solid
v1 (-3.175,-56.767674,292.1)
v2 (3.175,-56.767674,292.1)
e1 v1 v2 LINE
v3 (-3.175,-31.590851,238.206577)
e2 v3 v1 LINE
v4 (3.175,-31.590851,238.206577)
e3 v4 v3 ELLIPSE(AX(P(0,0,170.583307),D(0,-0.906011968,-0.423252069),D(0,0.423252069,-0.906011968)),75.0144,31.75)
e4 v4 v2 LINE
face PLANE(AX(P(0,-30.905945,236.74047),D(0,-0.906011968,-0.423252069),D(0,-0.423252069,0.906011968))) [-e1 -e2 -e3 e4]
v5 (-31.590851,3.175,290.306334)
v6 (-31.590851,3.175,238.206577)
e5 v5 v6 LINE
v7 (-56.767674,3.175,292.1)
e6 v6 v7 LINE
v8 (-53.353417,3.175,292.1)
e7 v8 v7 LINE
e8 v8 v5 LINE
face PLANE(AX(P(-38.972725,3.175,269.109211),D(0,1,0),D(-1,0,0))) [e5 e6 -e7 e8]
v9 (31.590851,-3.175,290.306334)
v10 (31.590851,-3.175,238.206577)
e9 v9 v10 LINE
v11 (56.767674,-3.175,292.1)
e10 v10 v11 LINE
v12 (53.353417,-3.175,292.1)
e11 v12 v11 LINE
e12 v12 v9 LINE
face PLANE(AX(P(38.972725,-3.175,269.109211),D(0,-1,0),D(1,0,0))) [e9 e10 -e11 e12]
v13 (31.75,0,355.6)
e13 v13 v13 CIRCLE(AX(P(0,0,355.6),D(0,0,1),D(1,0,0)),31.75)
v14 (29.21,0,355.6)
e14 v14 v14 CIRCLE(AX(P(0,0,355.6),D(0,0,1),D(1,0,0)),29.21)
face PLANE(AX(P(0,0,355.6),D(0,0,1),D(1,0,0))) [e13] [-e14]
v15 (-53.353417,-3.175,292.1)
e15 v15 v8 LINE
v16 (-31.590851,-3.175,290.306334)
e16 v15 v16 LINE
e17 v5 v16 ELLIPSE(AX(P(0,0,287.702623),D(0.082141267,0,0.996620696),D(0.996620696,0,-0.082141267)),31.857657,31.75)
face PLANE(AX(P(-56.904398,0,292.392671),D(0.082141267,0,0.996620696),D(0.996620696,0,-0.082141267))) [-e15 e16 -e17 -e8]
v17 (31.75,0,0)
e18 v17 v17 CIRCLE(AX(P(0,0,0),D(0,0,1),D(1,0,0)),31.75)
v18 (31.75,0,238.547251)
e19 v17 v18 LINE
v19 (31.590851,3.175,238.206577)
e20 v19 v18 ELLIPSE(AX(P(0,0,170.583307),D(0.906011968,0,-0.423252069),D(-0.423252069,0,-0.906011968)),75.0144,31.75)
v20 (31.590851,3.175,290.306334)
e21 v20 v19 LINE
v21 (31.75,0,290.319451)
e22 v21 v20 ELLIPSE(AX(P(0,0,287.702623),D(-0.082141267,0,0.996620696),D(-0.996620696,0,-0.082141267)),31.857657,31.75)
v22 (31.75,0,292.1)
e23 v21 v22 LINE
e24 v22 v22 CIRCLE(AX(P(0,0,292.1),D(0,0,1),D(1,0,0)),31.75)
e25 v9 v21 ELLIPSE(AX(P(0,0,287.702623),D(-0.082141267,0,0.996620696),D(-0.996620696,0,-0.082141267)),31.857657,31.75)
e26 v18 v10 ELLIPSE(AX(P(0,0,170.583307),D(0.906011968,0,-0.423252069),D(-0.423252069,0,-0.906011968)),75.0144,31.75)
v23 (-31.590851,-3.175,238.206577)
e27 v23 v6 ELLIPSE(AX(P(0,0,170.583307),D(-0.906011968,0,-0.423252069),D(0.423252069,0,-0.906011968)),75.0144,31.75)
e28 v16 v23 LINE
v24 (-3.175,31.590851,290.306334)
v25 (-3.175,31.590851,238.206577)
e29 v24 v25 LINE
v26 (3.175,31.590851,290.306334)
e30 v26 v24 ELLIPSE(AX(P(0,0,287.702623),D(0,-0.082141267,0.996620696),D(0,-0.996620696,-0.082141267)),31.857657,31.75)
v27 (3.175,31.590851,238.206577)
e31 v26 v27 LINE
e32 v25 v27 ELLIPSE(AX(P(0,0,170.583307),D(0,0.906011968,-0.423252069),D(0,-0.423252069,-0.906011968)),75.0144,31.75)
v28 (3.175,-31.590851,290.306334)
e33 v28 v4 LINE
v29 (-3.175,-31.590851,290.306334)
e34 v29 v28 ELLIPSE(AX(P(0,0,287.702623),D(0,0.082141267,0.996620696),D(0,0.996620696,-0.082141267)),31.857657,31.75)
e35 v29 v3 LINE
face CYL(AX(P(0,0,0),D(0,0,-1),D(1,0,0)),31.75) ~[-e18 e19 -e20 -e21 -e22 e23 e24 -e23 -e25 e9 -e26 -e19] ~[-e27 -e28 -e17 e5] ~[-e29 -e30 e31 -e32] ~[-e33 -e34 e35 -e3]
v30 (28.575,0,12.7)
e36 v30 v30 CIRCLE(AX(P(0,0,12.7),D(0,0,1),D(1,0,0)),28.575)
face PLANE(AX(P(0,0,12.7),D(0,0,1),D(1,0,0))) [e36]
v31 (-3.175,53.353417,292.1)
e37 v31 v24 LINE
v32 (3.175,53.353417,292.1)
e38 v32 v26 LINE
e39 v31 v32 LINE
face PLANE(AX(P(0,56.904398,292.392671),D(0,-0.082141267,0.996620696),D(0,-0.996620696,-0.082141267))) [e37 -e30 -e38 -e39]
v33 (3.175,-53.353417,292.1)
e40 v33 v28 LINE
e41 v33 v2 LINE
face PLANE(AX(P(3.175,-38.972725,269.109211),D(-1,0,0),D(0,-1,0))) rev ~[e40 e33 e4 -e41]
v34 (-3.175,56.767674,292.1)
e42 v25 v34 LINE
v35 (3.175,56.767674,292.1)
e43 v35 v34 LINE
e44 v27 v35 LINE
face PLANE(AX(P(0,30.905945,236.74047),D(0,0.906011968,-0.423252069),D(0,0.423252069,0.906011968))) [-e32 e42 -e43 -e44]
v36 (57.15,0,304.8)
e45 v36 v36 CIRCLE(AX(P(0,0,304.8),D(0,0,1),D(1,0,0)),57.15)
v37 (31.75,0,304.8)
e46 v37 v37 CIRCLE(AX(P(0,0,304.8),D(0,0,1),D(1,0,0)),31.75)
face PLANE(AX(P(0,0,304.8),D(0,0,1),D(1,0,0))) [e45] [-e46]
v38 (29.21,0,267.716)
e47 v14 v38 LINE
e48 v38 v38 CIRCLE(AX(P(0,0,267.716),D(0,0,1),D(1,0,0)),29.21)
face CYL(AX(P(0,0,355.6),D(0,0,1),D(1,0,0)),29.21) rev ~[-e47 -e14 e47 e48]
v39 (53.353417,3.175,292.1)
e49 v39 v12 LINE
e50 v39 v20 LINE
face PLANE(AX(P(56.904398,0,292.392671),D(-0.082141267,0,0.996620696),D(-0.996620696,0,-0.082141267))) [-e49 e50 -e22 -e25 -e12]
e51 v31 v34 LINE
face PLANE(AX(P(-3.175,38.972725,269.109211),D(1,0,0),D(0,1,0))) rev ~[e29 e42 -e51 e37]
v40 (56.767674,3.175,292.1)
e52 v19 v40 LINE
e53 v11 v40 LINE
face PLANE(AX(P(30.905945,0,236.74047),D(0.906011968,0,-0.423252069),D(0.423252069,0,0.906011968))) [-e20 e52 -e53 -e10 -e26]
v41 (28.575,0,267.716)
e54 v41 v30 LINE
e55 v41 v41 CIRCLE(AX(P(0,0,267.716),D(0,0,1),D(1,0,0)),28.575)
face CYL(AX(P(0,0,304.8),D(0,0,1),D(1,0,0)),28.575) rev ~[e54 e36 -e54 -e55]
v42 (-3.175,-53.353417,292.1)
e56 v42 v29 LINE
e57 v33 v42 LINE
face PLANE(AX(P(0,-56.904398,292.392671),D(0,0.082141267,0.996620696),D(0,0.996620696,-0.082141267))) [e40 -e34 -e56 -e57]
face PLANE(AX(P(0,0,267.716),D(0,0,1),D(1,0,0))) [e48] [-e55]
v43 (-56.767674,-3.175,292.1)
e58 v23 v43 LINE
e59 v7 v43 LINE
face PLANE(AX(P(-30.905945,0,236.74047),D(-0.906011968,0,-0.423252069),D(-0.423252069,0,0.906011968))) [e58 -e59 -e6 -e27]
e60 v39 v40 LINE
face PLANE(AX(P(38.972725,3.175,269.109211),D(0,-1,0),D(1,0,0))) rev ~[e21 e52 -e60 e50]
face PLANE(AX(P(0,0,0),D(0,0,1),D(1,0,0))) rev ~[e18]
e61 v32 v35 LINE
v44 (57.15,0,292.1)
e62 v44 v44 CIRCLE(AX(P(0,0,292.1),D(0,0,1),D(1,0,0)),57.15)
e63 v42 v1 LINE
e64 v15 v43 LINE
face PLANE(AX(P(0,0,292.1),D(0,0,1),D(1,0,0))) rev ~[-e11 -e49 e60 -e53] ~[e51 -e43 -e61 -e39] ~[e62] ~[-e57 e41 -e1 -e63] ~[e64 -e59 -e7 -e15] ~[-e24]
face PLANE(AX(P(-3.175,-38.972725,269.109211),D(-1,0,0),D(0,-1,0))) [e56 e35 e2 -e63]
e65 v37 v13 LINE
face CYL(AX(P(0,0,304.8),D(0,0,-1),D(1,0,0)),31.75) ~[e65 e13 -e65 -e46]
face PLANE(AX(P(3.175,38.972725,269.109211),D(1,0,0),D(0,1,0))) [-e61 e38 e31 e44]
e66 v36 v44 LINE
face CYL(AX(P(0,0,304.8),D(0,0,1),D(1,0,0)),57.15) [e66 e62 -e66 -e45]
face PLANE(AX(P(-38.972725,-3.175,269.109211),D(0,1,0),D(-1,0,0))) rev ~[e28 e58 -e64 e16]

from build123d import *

# Parameters (mm, degrees)
F0_R            = 31.75
F1_DEPTH        = 304.8
F2_R            = 28.575
F3_DEPTH        = 292.1
F4_R            = 57.15
F4_R_2          = 31.75
F5_DEPTH        = 12.7
F7_DEPTH        = 3.175
F7_COPIES_COUNT = 4
F8_R            = 31.75
F9_DEPTH        = 50.8
F10_R           = 29.21
F11_DEPTH       = 87.884


# Not quite as in the source:
# - a pattern or mirror of a feature is missing from the dataset's text; its kind, count and spacing are read off the source's solid


with BuildPart() as f1:
    # F0 (on Top) → F1 (new body)
    with BuildSketch(Plane.XY):
        Circle(F0_R)
    extrude(amount=F1_DEPTH)

    # F2 (on face) → F3 (cut)
    with BuildSketch(Plane.XY.offset(304.8)):
        Circle(F2_R)
    extrude(amount=-F3_DEPTH, mode=Mode.SUBTRACT)

    # F4 (on face) → F5 (join)
    with BuildSketch(Plane.XY.offset(304.8)):
        Circle(F4_R)
        Circle(F4_R_2, mode=Mode.SUBTRACT)
    extrude(amount=-F5_DEPTH)

    # F6 (on Right) → F7 (join, symmetric)
    with BuildSketch(Plane.YZ):
        Polygon((30.9059452266, 236.7404699326), (56.9043979049, 292.3926711082), (30.9059452266, 290.2498841286), align=None)
    f7 = extrude(amount=F7_DEPTH, both=True)

    # F7_copies: F7 ×4 about axis
    f7_copies_axis = Axis((0, 0, 0), (0, 0, 1))
    for i in range(1, F7_COPIES_COUNT):
        add(f7.rotate(f7_copies_axis, i * 360 / F7_COPIES_COUNT))

    # F8 (on face) → F9 (join)
    with BuildSketch(Plane.XY.offset(304.8)):
        Circle(F8_R)
    extrude(amount=F9_DEPTH)

    # F10 (on face) → F11 (cut)
    with BuildSketch(Plane.XY.offset(355.6)):
        Circle(F10_R)
    extrude(amount=-F11_DEPTH, mode=Mode.SUBTRACT)


solid = f1.part
